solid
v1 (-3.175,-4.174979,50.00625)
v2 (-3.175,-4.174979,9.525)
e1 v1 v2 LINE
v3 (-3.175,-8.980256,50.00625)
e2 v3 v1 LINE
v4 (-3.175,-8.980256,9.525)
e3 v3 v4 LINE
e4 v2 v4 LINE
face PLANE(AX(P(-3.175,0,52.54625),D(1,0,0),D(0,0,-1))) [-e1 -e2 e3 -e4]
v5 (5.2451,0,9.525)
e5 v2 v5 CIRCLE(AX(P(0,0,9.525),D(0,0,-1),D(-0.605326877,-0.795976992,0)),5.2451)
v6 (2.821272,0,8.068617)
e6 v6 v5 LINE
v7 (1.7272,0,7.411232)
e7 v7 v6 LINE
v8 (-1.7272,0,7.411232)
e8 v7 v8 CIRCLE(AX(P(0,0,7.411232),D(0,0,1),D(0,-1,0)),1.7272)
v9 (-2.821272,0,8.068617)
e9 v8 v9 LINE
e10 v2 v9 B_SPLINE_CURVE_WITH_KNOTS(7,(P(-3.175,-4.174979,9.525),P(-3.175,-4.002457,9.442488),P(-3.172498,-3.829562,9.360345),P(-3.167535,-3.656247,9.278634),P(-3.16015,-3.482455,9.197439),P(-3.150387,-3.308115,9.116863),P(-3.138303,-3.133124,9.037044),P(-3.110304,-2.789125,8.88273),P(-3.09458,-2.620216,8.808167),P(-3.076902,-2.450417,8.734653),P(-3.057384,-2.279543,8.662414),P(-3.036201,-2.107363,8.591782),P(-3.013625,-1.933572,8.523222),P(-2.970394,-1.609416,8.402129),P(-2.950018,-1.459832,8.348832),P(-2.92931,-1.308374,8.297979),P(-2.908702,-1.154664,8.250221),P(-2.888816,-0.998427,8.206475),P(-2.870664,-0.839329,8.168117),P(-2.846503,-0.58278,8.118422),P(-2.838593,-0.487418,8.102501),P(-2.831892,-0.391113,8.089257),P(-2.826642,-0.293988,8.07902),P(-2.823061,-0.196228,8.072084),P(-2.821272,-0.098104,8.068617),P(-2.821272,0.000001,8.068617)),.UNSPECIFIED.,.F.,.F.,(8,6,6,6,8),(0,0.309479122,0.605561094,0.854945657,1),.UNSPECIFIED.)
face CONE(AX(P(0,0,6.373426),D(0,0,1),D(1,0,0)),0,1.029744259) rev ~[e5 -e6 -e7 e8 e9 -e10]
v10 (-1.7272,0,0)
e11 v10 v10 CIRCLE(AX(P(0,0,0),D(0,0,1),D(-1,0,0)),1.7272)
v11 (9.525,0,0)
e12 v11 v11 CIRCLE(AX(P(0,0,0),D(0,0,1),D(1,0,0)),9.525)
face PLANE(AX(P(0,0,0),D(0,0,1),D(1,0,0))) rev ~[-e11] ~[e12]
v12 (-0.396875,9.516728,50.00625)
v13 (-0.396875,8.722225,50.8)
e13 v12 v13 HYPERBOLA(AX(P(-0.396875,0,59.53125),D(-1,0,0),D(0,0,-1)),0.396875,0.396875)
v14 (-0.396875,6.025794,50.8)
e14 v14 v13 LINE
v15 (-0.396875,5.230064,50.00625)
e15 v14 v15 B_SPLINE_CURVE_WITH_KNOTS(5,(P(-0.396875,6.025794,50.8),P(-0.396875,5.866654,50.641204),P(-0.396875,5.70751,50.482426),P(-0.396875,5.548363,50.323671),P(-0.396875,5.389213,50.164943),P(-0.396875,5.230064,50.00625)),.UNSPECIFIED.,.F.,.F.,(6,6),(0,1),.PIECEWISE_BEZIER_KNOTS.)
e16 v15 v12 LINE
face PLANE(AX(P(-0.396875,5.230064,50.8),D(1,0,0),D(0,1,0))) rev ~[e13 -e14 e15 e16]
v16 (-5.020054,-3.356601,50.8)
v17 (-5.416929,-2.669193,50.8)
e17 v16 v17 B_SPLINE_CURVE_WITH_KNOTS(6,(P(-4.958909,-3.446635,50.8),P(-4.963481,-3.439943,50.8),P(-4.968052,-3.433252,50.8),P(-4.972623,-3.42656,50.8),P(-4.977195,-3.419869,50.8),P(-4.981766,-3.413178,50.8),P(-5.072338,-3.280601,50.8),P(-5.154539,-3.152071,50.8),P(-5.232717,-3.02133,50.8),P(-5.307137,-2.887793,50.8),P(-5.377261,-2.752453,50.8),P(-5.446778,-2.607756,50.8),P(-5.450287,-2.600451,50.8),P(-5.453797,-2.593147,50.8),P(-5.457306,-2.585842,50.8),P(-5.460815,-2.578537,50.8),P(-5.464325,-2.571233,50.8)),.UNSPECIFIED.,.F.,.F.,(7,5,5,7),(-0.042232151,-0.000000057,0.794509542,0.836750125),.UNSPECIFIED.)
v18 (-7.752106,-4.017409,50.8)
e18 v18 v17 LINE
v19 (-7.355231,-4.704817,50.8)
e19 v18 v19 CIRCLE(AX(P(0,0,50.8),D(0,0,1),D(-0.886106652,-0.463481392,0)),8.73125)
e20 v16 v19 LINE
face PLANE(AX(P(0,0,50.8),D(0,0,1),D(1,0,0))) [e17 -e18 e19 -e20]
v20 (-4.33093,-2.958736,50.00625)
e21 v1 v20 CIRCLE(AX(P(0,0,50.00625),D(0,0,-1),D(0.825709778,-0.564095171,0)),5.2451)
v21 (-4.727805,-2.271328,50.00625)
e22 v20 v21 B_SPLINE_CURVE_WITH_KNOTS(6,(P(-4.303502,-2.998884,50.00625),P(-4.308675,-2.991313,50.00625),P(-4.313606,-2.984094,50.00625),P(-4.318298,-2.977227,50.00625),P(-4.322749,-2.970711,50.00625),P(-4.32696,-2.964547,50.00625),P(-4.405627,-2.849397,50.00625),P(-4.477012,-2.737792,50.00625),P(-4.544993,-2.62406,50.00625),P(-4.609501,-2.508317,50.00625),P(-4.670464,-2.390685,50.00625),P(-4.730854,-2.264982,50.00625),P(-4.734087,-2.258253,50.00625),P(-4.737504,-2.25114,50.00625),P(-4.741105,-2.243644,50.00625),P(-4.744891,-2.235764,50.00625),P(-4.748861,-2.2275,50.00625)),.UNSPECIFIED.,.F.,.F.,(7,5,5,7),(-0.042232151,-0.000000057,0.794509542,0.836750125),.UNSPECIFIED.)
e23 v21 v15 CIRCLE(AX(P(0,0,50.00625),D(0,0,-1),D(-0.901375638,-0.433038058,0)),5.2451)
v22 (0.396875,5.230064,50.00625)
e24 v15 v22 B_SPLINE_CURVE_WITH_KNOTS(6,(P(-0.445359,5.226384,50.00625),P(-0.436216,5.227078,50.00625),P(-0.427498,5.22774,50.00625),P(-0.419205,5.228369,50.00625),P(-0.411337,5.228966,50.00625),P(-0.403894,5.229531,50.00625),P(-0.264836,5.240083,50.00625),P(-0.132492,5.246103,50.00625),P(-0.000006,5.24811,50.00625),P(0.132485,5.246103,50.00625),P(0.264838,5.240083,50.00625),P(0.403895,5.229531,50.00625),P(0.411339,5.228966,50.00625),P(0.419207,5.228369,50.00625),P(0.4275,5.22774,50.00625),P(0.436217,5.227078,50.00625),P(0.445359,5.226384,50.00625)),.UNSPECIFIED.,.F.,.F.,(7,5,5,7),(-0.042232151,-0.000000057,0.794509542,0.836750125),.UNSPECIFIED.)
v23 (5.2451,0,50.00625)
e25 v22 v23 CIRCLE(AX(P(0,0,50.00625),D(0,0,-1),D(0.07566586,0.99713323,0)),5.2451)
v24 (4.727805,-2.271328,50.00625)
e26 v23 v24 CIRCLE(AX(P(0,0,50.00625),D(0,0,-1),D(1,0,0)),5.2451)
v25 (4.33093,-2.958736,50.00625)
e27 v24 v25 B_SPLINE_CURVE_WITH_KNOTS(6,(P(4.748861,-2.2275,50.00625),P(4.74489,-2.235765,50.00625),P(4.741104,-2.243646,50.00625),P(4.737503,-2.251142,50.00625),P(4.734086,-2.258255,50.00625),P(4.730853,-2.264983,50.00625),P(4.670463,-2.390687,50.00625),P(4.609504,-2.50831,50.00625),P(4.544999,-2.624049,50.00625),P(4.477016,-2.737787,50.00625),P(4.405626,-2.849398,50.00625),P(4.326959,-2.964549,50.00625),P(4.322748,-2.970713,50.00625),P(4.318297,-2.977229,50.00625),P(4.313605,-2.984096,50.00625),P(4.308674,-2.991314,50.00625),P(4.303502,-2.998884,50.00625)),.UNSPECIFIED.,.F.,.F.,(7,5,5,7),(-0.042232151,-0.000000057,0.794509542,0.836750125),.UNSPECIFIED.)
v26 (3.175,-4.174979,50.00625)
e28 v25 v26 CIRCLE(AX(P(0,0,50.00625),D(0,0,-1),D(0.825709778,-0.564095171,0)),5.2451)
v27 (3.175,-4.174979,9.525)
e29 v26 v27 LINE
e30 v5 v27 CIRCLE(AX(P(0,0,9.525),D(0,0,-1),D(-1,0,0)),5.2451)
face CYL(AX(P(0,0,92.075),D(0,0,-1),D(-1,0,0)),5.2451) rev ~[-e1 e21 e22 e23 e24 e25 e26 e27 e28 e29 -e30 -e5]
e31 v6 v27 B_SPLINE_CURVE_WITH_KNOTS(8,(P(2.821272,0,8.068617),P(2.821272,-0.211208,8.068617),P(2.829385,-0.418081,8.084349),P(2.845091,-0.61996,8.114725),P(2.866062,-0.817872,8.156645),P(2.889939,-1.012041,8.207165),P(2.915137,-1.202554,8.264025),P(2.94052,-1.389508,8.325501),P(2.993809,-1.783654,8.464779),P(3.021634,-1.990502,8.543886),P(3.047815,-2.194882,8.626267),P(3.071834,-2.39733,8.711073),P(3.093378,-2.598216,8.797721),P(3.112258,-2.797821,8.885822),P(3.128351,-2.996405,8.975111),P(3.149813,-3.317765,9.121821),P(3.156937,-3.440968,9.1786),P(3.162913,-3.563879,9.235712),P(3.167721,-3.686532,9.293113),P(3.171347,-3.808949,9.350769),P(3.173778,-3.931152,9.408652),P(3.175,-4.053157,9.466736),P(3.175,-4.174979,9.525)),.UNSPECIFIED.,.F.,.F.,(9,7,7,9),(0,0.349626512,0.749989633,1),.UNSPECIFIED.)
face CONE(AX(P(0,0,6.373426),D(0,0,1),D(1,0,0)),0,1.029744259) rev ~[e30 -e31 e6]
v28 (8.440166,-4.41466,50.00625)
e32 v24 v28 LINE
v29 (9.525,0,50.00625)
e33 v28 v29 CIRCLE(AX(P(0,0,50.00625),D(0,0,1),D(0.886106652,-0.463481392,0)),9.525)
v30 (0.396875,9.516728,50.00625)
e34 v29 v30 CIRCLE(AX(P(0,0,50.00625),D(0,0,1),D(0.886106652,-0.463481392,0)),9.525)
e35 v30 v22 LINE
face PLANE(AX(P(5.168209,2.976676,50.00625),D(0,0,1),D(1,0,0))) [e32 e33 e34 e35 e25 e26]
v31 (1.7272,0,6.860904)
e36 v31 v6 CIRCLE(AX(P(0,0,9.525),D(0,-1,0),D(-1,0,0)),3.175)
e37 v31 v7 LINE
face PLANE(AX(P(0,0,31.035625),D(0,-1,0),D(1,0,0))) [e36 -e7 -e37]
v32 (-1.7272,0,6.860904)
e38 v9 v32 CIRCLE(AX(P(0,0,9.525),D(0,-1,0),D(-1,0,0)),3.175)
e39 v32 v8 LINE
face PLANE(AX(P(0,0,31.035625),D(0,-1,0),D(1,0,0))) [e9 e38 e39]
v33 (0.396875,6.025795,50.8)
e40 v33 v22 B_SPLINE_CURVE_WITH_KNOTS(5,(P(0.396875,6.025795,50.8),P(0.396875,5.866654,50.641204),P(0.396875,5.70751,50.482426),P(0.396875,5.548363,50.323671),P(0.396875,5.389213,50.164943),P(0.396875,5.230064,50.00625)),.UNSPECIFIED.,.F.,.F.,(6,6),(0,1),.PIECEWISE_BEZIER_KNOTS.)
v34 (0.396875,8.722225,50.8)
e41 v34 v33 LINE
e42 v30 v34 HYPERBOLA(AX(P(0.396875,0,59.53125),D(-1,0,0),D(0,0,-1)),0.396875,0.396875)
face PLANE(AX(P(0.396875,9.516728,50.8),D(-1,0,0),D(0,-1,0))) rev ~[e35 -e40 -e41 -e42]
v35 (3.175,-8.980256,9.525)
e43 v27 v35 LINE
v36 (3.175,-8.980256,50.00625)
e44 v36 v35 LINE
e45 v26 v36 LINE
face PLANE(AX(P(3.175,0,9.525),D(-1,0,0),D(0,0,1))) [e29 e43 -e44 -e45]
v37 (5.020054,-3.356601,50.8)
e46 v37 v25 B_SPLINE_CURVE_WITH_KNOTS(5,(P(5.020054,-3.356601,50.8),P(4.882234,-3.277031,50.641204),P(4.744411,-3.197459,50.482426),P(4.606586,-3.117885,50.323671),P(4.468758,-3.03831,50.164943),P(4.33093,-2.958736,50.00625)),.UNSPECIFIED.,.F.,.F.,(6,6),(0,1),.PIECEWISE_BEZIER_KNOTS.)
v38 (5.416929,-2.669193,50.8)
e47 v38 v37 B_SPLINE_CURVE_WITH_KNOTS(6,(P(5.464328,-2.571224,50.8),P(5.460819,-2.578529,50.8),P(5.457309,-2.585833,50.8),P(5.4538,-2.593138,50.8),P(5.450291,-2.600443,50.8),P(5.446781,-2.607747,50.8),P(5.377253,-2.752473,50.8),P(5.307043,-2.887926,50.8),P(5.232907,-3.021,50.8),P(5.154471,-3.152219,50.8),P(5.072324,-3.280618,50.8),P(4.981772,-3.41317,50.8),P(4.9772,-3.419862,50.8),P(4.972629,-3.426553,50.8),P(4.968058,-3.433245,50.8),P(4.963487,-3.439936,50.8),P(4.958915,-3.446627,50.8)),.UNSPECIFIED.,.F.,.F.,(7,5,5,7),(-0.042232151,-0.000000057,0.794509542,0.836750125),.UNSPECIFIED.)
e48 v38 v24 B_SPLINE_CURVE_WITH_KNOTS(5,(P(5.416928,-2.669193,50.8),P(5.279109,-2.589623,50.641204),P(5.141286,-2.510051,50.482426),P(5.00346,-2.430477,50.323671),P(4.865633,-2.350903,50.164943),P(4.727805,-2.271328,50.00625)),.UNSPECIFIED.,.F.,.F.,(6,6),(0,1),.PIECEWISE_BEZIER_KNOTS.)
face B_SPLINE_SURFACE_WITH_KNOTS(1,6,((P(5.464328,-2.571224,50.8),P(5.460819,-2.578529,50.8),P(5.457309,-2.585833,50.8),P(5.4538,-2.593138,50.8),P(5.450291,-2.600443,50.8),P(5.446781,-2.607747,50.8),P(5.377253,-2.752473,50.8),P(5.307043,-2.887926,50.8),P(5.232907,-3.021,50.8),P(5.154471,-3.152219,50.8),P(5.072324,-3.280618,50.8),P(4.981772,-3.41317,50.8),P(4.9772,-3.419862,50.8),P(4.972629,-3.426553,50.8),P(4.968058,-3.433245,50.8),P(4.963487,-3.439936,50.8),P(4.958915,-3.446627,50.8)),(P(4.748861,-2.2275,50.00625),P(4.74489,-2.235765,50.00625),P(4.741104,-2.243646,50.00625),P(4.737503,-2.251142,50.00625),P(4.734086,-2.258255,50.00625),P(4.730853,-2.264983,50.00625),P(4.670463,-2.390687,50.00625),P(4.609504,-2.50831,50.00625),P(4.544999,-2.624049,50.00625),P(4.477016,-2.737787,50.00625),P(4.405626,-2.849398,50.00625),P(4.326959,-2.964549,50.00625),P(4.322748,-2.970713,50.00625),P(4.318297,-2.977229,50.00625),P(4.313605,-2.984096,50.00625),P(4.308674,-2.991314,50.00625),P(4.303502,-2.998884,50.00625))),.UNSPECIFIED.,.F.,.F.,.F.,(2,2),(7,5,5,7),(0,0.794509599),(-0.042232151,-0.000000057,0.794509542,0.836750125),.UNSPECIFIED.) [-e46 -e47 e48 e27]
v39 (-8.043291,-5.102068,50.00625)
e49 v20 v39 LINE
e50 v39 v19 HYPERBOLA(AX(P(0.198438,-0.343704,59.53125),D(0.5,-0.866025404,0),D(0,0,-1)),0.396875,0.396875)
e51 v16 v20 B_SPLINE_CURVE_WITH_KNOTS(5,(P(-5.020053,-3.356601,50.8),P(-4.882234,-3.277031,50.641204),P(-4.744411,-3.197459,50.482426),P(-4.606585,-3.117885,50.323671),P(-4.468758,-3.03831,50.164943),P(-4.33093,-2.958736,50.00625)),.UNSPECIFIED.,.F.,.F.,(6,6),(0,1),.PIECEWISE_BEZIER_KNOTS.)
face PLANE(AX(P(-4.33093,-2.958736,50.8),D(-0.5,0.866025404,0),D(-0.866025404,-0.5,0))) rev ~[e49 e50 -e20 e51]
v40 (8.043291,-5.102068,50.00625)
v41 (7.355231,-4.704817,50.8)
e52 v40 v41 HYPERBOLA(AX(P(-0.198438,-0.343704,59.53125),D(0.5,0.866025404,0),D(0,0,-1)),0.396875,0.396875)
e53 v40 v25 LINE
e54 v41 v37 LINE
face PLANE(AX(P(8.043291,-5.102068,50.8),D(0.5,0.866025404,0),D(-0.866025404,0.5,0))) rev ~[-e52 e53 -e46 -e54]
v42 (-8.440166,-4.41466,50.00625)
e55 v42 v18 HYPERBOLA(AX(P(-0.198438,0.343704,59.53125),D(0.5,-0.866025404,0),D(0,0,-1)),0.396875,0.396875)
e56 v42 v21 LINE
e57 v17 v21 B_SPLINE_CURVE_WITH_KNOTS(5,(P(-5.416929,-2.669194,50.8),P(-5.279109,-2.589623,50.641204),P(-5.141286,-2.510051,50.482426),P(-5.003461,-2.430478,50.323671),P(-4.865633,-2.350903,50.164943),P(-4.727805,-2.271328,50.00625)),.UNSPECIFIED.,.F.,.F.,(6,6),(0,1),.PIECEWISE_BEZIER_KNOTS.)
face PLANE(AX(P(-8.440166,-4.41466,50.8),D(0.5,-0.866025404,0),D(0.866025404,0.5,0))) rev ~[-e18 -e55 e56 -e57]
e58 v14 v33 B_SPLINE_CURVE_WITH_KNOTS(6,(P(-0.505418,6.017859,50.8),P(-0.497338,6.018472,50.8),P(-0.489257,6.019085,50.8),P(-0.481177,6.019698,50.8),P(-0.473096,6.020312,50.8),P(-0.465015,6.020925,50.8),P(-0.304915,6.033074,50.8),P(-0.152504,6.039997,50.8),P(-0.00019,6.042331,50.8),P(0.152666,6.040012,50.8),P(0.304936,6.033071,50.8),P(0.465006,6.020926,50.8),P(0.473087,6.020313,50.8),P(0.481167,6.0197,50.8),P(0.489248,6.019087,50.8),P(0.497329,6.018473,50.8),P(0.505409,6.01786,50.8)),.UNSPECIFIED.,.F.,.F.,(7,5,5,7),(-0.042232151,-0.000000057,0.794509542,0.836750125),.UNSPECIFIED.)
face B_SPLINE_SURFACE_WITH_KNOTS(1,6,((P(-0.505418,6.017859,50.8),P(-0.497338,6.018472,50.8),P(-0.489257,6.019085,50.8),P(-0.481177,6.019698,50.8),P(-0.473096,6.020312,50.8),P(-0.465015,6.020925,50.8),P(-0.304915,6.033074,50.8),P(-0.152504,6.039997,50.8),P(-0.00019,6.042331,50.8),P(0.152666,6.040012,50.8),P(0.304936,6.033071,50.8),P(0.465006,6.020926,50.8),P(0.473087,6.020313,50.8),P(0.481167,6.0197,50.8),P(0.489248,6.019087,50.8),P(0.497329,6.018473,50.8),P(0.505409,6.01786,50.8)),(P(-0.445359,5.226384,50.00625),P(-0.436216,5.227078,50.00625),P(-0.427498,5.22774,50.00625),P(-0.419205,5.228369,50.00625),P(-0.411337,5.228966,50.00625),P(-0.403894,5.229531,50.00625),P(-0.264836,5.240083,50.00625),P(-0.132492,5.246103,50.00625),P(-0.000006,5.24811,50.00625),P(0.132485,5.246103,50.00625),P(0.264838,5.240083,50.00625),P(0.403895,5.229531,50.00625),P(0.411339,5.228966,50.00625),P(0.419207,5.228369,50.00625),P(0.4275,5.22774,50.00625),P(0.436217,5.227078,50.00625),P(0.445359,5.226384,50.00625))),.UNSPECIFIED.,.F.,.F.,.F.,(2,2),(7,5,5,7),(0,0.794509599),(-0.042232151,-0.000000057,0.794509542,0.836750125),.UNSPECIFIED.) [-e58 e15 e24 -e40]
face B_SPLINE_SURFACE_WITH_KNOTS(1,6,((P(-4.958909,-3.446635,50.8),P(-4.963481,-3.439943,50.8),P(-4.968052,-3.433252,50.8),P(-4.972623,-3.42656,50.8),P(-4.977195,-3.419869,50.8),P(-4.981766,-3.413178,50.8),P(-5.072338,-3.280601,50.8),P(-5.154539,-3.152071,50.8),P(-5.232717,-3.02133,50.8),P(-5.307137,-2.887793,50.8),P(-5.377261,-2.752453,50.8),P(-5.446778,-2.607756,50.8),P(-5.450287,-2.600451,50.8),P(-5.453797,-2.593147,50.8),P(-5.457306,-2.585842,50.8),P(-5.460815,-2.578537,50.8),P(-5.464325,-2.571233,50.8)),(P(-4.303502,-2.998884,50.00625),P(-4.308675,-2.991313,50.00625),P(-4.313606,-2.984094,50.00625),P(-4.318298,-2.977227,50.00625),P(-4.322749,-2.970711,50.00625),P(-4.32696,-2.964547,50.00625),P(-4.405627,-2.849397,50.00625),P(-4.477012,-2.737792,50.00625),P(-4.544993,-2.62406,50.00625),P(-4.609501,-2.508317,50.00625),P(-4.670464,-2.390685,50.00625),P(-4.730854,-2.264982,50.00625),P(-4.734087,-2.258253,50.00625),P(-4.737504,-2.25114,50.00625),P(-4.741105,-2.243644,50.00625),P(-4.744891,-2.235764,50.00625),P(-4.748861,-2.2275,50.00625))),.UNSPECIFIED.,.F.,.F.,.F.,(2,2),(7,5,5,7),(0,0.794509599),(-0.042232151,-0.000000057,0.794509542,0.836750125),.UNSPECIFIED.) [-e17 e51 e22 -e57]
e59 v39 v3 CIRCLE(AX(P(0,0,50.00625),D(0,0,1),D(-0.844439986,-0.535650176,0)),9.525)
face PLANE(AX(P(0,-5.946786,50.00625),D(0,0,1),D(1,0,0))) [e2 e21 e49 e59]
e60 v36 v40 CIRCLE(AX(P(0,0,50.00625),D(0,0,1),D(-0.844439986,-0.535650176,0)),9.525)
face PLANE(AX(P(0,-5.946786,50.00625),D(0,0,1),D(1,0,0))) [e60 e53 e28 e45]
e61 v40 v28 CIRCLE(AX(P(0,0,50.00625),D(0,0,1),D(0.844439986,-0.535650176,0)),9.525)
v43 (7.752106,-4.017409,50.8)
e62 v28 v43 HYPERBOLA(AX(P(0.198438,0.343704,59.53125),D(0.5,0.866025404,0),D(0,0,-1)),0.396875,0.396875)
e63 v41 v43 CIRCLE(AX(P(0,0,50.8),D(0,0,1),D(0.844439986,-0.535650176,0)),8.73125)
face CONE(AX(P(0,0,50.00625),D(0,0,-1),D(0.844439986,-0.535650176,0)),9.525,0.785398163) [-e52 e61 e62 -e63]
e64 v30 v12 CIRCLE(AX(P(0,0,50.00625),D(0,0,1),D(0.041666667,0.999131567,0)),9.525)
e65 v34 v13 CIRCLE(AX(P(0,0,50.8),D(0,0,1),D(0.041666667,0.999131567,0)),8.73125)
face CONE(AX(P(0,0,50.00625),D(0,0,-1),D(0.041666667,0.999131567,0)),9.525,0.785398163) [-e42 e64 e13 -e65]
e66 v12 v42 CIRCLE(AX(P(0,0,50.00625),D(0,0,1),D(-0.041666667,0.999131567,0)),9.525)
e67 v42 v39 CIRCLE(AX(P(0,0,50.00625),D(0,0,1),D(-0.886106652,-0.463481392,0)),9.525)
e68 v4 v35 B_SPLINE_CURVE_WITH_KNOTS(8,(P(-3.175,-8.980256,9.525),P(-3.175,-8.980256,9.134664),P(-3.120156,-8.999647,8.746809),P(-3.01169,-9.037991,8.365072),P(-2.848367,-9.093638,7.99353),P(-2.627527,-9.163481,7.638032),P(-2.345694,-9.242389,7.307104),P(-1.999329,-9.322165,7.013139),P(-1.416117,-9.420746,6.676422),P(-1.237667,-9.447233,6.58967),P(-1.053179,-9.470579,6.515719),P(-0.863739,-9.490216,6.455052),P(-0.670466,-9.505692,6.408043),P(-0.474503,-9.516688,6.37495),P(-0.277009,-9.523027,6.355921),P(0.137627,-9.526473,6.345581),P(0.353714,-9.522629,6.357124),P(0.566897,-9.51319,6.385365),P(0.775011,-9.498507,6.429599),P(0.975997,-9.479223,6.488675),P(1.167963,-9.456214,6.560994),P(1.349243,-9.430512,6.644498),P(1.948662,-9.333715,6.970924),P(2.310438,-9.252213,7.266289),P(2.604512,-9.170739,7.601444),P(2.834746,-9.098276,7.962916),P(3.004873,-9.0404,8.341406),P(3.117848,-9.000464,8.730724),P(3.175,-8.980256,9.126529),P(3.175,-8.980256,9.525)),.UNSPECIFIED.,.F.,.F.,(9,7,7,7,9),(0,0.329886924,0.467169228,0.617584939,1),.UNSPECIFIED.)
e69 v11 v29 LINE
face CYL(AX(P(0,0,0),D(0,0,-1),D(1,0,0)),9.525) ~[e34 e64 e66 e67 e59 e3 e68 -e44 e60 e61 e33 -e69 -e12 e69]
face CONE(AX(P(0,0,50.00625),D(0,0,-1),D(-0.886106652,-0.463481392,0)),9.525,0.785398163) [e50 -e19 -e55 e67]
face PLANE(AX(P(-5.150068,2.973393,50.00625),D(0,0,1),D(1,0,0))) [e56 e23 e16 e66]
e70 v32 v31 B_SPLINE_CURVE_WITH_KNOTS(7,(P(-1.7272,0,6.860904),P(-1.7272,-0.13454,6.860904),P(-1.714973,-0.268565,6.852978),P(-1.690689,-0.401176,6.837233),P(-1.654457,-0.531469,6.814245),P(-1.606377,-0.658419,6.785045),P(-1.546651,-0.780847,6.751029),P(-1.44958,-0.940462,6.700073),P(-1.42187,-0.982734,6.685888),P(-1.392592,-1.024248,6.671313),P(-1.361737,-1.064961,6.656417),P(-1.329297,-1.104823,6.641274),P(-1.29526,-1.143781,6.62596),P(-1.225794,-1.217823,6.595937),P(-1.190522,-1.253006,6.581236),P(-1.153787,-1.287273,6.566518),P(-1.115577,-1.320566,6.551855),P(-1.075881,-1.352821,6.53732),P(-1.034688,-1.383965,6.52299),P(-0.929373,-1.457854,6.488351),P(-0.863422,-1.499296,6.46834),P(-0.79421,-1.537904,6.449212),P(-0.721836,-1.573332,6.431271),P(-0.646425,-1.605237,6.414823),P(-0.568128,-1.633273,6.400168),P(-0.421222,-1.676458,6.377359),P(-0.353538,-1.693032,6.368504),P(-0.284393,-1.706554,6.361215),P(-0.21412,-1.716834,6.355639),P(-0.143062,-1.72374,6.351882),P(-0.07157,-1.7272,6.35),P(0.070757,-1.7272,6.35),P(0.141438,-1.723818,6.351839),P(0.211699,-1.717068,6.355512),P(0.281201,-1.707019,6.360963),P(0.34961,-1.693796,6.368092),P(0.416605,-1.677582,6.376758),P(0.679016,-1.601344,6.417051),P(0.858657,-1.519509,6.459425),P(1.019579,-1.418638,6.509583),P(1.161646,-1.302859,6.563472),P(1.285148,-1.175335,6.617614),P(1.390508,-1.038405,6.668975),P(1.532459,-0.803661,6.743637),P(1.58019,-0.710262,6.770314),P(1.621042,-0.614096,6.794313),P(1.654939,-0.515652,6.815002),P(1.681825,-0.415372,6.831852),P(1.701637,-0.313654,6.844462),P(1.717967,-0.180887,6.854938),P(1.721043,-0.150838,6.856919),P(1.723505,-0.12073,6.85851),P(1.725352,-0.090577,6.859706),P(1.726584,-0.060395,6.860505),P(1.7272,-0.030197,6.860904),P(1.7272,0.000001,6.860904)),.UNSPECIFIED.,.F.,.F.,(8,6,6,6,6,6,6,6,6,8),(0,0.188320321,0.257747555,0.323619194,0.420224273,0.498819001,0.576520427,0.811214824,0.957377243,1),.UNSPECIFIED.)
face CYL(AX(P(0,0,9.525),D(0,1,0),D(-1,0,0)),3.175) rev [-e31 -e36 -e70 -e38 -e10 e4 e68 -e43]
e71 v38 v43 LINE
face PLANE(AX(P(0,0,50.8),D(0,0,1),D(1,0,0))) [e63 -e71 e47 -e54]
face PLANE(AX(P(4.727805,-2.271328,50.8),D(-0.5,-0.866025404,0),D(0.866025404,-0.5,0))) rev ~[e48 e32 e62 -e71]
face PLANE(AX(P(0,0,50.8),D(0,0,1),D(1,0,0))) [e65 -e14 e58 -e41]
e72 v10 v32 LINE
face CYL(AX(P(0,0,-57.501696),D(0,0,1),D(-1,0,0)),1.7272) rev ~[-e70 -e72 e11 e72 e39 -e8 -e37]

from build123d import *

# Parameters (mm, degrees)
F0_R      = 9.525
F1_DEPTH  = 50.8
F3_D      = 10.4902
F3_DEPTH  = 41.275
F3_TIP    = 3.1515740329
F5_D      = 3.4544
F7_DEPTH  = 0.79375
F8_SIZE   = 0.79375
F10_DEPTH = 25.4


with BuildPart() as f1:
    # F0 (on Top) → F1 (new body)
    with BuildSketch(Plane.XY):
        Circle(F0_R)
    extrude(amount=F1_DEPTH)

    # F3
    with Locations(Plane.XY.offset(50.8)):
        with Locations((0, 0)):
            Hole(F3_D / 2, depth=F3_DEPTH)
            with Locations((0, 0, -(F3_DEPTH + F3_TIP / 2))):  # 118° drill point
                Cone(0, F3_D / 2, F3_TIP, mode=Mode.SUBTRACT)

    # F5 (through all)
    with Locations(Plane(origin=(0, 0, 0), x_dir=(1, 0, 0), z_dir=(0, 0, -1))):
        with Locations((0, 0)):
            Hole(F5_D / 2)

    # F6 (on face) → F7 (cut)
    with BuildSketch(Plane.XY.offset(50.8)):
        with BuildLine():
            ThreePointArc((-4.7278053569, -2.2713279193), (-4.5423898454, 2.62255), (-0.396875, 5.2300635029))
            Line((-0.396875, 5.2300635029), (-0.396875, 9.5167281791))
            ThreePointArc((-0.396875, 9.5167281791), (-8.248891971, 4.7625), (-8.440165864, -4.4146602574))
            Line((-8.440165864, -4.4146602574), (-4.7278053569, -2.2713279193))
        make_face()
        with BuildLine():
            Line((8.043290864, -5.1020679217), (4.3309303569, -2.9587355836))
            ThreePointArc((4.3309303569, -2.9587355836), (0, -5.2451), (-4.3309303569, -2.9587355836))
            Line((-4.3309303569, -2.9587355836), (-8.043290864, -5.1020679217))
            ThreePointArc((-8.043290864, -5.1020679217), (0, -9.525), (8.043290864, -5.1020679217))
        make_face()
        with BuildLine():
            ThreePointArc((0.396875, 5.2300635029), (3.8466038965, 3.5657695486), (5.2451, 0))
            ThreePointArc((5.2451, 0), (5.1141414669, -1.1647450649), (4.7278053569, -2.2713279193))
            Line((4.7278053569, -2.2713279193), (8.440165864, -4.4146602574))
            ThreePointArc((8.440165864, -4.4146602574), (9.2498163456, -2.2729985862), (9.525, 0))
            ThreePointArc((9.525, 0), (6.8740766425, 6.5933826912), (0.396875, 9.5167281791))
            Line((0.396875, 9.5167281791), (0.396875, 5.2300635029))
        make_face()
    extrude(amount=-F7_DEPTH, mode=Mode.SUBTRACT)

    # F8
    f8_edges = [f1.edges().sort_by_distance(p)[0] for p in [
        (8.248892, -4.7625, 50.8),
        (0, 9.525, 50.8),
        (-8.248892, -4.7625, 50.8),
        (4.54239, -2.62255, 50.8),
        (-4.54239, -2.62255, 50.8),
        (0, 5.2451, 50.8),
    ]]
    chamfer(f8_edges, length=F8_SIZE)

    # F9 (on Front) → F10 (cut)
    with BuildSketch(Plane.XZ):
        with BuildLine():
            ThreePointArc((3.175, 52.54625), (0, 55.72125), (-3.175, 52.54625))
            Line((-3.175, 52.54625), (-3.175, 9.525))
            ThreePointArc((-3.175, 9.525), (0, 6.35), (3.175, 9.525))
            Line((3.175, 9.525), (3.175, 52.54625))
        make_face()
    extrude(amount=F10_DEPTH, mode=Mode.SUBTRACT)


solid = f1.part
